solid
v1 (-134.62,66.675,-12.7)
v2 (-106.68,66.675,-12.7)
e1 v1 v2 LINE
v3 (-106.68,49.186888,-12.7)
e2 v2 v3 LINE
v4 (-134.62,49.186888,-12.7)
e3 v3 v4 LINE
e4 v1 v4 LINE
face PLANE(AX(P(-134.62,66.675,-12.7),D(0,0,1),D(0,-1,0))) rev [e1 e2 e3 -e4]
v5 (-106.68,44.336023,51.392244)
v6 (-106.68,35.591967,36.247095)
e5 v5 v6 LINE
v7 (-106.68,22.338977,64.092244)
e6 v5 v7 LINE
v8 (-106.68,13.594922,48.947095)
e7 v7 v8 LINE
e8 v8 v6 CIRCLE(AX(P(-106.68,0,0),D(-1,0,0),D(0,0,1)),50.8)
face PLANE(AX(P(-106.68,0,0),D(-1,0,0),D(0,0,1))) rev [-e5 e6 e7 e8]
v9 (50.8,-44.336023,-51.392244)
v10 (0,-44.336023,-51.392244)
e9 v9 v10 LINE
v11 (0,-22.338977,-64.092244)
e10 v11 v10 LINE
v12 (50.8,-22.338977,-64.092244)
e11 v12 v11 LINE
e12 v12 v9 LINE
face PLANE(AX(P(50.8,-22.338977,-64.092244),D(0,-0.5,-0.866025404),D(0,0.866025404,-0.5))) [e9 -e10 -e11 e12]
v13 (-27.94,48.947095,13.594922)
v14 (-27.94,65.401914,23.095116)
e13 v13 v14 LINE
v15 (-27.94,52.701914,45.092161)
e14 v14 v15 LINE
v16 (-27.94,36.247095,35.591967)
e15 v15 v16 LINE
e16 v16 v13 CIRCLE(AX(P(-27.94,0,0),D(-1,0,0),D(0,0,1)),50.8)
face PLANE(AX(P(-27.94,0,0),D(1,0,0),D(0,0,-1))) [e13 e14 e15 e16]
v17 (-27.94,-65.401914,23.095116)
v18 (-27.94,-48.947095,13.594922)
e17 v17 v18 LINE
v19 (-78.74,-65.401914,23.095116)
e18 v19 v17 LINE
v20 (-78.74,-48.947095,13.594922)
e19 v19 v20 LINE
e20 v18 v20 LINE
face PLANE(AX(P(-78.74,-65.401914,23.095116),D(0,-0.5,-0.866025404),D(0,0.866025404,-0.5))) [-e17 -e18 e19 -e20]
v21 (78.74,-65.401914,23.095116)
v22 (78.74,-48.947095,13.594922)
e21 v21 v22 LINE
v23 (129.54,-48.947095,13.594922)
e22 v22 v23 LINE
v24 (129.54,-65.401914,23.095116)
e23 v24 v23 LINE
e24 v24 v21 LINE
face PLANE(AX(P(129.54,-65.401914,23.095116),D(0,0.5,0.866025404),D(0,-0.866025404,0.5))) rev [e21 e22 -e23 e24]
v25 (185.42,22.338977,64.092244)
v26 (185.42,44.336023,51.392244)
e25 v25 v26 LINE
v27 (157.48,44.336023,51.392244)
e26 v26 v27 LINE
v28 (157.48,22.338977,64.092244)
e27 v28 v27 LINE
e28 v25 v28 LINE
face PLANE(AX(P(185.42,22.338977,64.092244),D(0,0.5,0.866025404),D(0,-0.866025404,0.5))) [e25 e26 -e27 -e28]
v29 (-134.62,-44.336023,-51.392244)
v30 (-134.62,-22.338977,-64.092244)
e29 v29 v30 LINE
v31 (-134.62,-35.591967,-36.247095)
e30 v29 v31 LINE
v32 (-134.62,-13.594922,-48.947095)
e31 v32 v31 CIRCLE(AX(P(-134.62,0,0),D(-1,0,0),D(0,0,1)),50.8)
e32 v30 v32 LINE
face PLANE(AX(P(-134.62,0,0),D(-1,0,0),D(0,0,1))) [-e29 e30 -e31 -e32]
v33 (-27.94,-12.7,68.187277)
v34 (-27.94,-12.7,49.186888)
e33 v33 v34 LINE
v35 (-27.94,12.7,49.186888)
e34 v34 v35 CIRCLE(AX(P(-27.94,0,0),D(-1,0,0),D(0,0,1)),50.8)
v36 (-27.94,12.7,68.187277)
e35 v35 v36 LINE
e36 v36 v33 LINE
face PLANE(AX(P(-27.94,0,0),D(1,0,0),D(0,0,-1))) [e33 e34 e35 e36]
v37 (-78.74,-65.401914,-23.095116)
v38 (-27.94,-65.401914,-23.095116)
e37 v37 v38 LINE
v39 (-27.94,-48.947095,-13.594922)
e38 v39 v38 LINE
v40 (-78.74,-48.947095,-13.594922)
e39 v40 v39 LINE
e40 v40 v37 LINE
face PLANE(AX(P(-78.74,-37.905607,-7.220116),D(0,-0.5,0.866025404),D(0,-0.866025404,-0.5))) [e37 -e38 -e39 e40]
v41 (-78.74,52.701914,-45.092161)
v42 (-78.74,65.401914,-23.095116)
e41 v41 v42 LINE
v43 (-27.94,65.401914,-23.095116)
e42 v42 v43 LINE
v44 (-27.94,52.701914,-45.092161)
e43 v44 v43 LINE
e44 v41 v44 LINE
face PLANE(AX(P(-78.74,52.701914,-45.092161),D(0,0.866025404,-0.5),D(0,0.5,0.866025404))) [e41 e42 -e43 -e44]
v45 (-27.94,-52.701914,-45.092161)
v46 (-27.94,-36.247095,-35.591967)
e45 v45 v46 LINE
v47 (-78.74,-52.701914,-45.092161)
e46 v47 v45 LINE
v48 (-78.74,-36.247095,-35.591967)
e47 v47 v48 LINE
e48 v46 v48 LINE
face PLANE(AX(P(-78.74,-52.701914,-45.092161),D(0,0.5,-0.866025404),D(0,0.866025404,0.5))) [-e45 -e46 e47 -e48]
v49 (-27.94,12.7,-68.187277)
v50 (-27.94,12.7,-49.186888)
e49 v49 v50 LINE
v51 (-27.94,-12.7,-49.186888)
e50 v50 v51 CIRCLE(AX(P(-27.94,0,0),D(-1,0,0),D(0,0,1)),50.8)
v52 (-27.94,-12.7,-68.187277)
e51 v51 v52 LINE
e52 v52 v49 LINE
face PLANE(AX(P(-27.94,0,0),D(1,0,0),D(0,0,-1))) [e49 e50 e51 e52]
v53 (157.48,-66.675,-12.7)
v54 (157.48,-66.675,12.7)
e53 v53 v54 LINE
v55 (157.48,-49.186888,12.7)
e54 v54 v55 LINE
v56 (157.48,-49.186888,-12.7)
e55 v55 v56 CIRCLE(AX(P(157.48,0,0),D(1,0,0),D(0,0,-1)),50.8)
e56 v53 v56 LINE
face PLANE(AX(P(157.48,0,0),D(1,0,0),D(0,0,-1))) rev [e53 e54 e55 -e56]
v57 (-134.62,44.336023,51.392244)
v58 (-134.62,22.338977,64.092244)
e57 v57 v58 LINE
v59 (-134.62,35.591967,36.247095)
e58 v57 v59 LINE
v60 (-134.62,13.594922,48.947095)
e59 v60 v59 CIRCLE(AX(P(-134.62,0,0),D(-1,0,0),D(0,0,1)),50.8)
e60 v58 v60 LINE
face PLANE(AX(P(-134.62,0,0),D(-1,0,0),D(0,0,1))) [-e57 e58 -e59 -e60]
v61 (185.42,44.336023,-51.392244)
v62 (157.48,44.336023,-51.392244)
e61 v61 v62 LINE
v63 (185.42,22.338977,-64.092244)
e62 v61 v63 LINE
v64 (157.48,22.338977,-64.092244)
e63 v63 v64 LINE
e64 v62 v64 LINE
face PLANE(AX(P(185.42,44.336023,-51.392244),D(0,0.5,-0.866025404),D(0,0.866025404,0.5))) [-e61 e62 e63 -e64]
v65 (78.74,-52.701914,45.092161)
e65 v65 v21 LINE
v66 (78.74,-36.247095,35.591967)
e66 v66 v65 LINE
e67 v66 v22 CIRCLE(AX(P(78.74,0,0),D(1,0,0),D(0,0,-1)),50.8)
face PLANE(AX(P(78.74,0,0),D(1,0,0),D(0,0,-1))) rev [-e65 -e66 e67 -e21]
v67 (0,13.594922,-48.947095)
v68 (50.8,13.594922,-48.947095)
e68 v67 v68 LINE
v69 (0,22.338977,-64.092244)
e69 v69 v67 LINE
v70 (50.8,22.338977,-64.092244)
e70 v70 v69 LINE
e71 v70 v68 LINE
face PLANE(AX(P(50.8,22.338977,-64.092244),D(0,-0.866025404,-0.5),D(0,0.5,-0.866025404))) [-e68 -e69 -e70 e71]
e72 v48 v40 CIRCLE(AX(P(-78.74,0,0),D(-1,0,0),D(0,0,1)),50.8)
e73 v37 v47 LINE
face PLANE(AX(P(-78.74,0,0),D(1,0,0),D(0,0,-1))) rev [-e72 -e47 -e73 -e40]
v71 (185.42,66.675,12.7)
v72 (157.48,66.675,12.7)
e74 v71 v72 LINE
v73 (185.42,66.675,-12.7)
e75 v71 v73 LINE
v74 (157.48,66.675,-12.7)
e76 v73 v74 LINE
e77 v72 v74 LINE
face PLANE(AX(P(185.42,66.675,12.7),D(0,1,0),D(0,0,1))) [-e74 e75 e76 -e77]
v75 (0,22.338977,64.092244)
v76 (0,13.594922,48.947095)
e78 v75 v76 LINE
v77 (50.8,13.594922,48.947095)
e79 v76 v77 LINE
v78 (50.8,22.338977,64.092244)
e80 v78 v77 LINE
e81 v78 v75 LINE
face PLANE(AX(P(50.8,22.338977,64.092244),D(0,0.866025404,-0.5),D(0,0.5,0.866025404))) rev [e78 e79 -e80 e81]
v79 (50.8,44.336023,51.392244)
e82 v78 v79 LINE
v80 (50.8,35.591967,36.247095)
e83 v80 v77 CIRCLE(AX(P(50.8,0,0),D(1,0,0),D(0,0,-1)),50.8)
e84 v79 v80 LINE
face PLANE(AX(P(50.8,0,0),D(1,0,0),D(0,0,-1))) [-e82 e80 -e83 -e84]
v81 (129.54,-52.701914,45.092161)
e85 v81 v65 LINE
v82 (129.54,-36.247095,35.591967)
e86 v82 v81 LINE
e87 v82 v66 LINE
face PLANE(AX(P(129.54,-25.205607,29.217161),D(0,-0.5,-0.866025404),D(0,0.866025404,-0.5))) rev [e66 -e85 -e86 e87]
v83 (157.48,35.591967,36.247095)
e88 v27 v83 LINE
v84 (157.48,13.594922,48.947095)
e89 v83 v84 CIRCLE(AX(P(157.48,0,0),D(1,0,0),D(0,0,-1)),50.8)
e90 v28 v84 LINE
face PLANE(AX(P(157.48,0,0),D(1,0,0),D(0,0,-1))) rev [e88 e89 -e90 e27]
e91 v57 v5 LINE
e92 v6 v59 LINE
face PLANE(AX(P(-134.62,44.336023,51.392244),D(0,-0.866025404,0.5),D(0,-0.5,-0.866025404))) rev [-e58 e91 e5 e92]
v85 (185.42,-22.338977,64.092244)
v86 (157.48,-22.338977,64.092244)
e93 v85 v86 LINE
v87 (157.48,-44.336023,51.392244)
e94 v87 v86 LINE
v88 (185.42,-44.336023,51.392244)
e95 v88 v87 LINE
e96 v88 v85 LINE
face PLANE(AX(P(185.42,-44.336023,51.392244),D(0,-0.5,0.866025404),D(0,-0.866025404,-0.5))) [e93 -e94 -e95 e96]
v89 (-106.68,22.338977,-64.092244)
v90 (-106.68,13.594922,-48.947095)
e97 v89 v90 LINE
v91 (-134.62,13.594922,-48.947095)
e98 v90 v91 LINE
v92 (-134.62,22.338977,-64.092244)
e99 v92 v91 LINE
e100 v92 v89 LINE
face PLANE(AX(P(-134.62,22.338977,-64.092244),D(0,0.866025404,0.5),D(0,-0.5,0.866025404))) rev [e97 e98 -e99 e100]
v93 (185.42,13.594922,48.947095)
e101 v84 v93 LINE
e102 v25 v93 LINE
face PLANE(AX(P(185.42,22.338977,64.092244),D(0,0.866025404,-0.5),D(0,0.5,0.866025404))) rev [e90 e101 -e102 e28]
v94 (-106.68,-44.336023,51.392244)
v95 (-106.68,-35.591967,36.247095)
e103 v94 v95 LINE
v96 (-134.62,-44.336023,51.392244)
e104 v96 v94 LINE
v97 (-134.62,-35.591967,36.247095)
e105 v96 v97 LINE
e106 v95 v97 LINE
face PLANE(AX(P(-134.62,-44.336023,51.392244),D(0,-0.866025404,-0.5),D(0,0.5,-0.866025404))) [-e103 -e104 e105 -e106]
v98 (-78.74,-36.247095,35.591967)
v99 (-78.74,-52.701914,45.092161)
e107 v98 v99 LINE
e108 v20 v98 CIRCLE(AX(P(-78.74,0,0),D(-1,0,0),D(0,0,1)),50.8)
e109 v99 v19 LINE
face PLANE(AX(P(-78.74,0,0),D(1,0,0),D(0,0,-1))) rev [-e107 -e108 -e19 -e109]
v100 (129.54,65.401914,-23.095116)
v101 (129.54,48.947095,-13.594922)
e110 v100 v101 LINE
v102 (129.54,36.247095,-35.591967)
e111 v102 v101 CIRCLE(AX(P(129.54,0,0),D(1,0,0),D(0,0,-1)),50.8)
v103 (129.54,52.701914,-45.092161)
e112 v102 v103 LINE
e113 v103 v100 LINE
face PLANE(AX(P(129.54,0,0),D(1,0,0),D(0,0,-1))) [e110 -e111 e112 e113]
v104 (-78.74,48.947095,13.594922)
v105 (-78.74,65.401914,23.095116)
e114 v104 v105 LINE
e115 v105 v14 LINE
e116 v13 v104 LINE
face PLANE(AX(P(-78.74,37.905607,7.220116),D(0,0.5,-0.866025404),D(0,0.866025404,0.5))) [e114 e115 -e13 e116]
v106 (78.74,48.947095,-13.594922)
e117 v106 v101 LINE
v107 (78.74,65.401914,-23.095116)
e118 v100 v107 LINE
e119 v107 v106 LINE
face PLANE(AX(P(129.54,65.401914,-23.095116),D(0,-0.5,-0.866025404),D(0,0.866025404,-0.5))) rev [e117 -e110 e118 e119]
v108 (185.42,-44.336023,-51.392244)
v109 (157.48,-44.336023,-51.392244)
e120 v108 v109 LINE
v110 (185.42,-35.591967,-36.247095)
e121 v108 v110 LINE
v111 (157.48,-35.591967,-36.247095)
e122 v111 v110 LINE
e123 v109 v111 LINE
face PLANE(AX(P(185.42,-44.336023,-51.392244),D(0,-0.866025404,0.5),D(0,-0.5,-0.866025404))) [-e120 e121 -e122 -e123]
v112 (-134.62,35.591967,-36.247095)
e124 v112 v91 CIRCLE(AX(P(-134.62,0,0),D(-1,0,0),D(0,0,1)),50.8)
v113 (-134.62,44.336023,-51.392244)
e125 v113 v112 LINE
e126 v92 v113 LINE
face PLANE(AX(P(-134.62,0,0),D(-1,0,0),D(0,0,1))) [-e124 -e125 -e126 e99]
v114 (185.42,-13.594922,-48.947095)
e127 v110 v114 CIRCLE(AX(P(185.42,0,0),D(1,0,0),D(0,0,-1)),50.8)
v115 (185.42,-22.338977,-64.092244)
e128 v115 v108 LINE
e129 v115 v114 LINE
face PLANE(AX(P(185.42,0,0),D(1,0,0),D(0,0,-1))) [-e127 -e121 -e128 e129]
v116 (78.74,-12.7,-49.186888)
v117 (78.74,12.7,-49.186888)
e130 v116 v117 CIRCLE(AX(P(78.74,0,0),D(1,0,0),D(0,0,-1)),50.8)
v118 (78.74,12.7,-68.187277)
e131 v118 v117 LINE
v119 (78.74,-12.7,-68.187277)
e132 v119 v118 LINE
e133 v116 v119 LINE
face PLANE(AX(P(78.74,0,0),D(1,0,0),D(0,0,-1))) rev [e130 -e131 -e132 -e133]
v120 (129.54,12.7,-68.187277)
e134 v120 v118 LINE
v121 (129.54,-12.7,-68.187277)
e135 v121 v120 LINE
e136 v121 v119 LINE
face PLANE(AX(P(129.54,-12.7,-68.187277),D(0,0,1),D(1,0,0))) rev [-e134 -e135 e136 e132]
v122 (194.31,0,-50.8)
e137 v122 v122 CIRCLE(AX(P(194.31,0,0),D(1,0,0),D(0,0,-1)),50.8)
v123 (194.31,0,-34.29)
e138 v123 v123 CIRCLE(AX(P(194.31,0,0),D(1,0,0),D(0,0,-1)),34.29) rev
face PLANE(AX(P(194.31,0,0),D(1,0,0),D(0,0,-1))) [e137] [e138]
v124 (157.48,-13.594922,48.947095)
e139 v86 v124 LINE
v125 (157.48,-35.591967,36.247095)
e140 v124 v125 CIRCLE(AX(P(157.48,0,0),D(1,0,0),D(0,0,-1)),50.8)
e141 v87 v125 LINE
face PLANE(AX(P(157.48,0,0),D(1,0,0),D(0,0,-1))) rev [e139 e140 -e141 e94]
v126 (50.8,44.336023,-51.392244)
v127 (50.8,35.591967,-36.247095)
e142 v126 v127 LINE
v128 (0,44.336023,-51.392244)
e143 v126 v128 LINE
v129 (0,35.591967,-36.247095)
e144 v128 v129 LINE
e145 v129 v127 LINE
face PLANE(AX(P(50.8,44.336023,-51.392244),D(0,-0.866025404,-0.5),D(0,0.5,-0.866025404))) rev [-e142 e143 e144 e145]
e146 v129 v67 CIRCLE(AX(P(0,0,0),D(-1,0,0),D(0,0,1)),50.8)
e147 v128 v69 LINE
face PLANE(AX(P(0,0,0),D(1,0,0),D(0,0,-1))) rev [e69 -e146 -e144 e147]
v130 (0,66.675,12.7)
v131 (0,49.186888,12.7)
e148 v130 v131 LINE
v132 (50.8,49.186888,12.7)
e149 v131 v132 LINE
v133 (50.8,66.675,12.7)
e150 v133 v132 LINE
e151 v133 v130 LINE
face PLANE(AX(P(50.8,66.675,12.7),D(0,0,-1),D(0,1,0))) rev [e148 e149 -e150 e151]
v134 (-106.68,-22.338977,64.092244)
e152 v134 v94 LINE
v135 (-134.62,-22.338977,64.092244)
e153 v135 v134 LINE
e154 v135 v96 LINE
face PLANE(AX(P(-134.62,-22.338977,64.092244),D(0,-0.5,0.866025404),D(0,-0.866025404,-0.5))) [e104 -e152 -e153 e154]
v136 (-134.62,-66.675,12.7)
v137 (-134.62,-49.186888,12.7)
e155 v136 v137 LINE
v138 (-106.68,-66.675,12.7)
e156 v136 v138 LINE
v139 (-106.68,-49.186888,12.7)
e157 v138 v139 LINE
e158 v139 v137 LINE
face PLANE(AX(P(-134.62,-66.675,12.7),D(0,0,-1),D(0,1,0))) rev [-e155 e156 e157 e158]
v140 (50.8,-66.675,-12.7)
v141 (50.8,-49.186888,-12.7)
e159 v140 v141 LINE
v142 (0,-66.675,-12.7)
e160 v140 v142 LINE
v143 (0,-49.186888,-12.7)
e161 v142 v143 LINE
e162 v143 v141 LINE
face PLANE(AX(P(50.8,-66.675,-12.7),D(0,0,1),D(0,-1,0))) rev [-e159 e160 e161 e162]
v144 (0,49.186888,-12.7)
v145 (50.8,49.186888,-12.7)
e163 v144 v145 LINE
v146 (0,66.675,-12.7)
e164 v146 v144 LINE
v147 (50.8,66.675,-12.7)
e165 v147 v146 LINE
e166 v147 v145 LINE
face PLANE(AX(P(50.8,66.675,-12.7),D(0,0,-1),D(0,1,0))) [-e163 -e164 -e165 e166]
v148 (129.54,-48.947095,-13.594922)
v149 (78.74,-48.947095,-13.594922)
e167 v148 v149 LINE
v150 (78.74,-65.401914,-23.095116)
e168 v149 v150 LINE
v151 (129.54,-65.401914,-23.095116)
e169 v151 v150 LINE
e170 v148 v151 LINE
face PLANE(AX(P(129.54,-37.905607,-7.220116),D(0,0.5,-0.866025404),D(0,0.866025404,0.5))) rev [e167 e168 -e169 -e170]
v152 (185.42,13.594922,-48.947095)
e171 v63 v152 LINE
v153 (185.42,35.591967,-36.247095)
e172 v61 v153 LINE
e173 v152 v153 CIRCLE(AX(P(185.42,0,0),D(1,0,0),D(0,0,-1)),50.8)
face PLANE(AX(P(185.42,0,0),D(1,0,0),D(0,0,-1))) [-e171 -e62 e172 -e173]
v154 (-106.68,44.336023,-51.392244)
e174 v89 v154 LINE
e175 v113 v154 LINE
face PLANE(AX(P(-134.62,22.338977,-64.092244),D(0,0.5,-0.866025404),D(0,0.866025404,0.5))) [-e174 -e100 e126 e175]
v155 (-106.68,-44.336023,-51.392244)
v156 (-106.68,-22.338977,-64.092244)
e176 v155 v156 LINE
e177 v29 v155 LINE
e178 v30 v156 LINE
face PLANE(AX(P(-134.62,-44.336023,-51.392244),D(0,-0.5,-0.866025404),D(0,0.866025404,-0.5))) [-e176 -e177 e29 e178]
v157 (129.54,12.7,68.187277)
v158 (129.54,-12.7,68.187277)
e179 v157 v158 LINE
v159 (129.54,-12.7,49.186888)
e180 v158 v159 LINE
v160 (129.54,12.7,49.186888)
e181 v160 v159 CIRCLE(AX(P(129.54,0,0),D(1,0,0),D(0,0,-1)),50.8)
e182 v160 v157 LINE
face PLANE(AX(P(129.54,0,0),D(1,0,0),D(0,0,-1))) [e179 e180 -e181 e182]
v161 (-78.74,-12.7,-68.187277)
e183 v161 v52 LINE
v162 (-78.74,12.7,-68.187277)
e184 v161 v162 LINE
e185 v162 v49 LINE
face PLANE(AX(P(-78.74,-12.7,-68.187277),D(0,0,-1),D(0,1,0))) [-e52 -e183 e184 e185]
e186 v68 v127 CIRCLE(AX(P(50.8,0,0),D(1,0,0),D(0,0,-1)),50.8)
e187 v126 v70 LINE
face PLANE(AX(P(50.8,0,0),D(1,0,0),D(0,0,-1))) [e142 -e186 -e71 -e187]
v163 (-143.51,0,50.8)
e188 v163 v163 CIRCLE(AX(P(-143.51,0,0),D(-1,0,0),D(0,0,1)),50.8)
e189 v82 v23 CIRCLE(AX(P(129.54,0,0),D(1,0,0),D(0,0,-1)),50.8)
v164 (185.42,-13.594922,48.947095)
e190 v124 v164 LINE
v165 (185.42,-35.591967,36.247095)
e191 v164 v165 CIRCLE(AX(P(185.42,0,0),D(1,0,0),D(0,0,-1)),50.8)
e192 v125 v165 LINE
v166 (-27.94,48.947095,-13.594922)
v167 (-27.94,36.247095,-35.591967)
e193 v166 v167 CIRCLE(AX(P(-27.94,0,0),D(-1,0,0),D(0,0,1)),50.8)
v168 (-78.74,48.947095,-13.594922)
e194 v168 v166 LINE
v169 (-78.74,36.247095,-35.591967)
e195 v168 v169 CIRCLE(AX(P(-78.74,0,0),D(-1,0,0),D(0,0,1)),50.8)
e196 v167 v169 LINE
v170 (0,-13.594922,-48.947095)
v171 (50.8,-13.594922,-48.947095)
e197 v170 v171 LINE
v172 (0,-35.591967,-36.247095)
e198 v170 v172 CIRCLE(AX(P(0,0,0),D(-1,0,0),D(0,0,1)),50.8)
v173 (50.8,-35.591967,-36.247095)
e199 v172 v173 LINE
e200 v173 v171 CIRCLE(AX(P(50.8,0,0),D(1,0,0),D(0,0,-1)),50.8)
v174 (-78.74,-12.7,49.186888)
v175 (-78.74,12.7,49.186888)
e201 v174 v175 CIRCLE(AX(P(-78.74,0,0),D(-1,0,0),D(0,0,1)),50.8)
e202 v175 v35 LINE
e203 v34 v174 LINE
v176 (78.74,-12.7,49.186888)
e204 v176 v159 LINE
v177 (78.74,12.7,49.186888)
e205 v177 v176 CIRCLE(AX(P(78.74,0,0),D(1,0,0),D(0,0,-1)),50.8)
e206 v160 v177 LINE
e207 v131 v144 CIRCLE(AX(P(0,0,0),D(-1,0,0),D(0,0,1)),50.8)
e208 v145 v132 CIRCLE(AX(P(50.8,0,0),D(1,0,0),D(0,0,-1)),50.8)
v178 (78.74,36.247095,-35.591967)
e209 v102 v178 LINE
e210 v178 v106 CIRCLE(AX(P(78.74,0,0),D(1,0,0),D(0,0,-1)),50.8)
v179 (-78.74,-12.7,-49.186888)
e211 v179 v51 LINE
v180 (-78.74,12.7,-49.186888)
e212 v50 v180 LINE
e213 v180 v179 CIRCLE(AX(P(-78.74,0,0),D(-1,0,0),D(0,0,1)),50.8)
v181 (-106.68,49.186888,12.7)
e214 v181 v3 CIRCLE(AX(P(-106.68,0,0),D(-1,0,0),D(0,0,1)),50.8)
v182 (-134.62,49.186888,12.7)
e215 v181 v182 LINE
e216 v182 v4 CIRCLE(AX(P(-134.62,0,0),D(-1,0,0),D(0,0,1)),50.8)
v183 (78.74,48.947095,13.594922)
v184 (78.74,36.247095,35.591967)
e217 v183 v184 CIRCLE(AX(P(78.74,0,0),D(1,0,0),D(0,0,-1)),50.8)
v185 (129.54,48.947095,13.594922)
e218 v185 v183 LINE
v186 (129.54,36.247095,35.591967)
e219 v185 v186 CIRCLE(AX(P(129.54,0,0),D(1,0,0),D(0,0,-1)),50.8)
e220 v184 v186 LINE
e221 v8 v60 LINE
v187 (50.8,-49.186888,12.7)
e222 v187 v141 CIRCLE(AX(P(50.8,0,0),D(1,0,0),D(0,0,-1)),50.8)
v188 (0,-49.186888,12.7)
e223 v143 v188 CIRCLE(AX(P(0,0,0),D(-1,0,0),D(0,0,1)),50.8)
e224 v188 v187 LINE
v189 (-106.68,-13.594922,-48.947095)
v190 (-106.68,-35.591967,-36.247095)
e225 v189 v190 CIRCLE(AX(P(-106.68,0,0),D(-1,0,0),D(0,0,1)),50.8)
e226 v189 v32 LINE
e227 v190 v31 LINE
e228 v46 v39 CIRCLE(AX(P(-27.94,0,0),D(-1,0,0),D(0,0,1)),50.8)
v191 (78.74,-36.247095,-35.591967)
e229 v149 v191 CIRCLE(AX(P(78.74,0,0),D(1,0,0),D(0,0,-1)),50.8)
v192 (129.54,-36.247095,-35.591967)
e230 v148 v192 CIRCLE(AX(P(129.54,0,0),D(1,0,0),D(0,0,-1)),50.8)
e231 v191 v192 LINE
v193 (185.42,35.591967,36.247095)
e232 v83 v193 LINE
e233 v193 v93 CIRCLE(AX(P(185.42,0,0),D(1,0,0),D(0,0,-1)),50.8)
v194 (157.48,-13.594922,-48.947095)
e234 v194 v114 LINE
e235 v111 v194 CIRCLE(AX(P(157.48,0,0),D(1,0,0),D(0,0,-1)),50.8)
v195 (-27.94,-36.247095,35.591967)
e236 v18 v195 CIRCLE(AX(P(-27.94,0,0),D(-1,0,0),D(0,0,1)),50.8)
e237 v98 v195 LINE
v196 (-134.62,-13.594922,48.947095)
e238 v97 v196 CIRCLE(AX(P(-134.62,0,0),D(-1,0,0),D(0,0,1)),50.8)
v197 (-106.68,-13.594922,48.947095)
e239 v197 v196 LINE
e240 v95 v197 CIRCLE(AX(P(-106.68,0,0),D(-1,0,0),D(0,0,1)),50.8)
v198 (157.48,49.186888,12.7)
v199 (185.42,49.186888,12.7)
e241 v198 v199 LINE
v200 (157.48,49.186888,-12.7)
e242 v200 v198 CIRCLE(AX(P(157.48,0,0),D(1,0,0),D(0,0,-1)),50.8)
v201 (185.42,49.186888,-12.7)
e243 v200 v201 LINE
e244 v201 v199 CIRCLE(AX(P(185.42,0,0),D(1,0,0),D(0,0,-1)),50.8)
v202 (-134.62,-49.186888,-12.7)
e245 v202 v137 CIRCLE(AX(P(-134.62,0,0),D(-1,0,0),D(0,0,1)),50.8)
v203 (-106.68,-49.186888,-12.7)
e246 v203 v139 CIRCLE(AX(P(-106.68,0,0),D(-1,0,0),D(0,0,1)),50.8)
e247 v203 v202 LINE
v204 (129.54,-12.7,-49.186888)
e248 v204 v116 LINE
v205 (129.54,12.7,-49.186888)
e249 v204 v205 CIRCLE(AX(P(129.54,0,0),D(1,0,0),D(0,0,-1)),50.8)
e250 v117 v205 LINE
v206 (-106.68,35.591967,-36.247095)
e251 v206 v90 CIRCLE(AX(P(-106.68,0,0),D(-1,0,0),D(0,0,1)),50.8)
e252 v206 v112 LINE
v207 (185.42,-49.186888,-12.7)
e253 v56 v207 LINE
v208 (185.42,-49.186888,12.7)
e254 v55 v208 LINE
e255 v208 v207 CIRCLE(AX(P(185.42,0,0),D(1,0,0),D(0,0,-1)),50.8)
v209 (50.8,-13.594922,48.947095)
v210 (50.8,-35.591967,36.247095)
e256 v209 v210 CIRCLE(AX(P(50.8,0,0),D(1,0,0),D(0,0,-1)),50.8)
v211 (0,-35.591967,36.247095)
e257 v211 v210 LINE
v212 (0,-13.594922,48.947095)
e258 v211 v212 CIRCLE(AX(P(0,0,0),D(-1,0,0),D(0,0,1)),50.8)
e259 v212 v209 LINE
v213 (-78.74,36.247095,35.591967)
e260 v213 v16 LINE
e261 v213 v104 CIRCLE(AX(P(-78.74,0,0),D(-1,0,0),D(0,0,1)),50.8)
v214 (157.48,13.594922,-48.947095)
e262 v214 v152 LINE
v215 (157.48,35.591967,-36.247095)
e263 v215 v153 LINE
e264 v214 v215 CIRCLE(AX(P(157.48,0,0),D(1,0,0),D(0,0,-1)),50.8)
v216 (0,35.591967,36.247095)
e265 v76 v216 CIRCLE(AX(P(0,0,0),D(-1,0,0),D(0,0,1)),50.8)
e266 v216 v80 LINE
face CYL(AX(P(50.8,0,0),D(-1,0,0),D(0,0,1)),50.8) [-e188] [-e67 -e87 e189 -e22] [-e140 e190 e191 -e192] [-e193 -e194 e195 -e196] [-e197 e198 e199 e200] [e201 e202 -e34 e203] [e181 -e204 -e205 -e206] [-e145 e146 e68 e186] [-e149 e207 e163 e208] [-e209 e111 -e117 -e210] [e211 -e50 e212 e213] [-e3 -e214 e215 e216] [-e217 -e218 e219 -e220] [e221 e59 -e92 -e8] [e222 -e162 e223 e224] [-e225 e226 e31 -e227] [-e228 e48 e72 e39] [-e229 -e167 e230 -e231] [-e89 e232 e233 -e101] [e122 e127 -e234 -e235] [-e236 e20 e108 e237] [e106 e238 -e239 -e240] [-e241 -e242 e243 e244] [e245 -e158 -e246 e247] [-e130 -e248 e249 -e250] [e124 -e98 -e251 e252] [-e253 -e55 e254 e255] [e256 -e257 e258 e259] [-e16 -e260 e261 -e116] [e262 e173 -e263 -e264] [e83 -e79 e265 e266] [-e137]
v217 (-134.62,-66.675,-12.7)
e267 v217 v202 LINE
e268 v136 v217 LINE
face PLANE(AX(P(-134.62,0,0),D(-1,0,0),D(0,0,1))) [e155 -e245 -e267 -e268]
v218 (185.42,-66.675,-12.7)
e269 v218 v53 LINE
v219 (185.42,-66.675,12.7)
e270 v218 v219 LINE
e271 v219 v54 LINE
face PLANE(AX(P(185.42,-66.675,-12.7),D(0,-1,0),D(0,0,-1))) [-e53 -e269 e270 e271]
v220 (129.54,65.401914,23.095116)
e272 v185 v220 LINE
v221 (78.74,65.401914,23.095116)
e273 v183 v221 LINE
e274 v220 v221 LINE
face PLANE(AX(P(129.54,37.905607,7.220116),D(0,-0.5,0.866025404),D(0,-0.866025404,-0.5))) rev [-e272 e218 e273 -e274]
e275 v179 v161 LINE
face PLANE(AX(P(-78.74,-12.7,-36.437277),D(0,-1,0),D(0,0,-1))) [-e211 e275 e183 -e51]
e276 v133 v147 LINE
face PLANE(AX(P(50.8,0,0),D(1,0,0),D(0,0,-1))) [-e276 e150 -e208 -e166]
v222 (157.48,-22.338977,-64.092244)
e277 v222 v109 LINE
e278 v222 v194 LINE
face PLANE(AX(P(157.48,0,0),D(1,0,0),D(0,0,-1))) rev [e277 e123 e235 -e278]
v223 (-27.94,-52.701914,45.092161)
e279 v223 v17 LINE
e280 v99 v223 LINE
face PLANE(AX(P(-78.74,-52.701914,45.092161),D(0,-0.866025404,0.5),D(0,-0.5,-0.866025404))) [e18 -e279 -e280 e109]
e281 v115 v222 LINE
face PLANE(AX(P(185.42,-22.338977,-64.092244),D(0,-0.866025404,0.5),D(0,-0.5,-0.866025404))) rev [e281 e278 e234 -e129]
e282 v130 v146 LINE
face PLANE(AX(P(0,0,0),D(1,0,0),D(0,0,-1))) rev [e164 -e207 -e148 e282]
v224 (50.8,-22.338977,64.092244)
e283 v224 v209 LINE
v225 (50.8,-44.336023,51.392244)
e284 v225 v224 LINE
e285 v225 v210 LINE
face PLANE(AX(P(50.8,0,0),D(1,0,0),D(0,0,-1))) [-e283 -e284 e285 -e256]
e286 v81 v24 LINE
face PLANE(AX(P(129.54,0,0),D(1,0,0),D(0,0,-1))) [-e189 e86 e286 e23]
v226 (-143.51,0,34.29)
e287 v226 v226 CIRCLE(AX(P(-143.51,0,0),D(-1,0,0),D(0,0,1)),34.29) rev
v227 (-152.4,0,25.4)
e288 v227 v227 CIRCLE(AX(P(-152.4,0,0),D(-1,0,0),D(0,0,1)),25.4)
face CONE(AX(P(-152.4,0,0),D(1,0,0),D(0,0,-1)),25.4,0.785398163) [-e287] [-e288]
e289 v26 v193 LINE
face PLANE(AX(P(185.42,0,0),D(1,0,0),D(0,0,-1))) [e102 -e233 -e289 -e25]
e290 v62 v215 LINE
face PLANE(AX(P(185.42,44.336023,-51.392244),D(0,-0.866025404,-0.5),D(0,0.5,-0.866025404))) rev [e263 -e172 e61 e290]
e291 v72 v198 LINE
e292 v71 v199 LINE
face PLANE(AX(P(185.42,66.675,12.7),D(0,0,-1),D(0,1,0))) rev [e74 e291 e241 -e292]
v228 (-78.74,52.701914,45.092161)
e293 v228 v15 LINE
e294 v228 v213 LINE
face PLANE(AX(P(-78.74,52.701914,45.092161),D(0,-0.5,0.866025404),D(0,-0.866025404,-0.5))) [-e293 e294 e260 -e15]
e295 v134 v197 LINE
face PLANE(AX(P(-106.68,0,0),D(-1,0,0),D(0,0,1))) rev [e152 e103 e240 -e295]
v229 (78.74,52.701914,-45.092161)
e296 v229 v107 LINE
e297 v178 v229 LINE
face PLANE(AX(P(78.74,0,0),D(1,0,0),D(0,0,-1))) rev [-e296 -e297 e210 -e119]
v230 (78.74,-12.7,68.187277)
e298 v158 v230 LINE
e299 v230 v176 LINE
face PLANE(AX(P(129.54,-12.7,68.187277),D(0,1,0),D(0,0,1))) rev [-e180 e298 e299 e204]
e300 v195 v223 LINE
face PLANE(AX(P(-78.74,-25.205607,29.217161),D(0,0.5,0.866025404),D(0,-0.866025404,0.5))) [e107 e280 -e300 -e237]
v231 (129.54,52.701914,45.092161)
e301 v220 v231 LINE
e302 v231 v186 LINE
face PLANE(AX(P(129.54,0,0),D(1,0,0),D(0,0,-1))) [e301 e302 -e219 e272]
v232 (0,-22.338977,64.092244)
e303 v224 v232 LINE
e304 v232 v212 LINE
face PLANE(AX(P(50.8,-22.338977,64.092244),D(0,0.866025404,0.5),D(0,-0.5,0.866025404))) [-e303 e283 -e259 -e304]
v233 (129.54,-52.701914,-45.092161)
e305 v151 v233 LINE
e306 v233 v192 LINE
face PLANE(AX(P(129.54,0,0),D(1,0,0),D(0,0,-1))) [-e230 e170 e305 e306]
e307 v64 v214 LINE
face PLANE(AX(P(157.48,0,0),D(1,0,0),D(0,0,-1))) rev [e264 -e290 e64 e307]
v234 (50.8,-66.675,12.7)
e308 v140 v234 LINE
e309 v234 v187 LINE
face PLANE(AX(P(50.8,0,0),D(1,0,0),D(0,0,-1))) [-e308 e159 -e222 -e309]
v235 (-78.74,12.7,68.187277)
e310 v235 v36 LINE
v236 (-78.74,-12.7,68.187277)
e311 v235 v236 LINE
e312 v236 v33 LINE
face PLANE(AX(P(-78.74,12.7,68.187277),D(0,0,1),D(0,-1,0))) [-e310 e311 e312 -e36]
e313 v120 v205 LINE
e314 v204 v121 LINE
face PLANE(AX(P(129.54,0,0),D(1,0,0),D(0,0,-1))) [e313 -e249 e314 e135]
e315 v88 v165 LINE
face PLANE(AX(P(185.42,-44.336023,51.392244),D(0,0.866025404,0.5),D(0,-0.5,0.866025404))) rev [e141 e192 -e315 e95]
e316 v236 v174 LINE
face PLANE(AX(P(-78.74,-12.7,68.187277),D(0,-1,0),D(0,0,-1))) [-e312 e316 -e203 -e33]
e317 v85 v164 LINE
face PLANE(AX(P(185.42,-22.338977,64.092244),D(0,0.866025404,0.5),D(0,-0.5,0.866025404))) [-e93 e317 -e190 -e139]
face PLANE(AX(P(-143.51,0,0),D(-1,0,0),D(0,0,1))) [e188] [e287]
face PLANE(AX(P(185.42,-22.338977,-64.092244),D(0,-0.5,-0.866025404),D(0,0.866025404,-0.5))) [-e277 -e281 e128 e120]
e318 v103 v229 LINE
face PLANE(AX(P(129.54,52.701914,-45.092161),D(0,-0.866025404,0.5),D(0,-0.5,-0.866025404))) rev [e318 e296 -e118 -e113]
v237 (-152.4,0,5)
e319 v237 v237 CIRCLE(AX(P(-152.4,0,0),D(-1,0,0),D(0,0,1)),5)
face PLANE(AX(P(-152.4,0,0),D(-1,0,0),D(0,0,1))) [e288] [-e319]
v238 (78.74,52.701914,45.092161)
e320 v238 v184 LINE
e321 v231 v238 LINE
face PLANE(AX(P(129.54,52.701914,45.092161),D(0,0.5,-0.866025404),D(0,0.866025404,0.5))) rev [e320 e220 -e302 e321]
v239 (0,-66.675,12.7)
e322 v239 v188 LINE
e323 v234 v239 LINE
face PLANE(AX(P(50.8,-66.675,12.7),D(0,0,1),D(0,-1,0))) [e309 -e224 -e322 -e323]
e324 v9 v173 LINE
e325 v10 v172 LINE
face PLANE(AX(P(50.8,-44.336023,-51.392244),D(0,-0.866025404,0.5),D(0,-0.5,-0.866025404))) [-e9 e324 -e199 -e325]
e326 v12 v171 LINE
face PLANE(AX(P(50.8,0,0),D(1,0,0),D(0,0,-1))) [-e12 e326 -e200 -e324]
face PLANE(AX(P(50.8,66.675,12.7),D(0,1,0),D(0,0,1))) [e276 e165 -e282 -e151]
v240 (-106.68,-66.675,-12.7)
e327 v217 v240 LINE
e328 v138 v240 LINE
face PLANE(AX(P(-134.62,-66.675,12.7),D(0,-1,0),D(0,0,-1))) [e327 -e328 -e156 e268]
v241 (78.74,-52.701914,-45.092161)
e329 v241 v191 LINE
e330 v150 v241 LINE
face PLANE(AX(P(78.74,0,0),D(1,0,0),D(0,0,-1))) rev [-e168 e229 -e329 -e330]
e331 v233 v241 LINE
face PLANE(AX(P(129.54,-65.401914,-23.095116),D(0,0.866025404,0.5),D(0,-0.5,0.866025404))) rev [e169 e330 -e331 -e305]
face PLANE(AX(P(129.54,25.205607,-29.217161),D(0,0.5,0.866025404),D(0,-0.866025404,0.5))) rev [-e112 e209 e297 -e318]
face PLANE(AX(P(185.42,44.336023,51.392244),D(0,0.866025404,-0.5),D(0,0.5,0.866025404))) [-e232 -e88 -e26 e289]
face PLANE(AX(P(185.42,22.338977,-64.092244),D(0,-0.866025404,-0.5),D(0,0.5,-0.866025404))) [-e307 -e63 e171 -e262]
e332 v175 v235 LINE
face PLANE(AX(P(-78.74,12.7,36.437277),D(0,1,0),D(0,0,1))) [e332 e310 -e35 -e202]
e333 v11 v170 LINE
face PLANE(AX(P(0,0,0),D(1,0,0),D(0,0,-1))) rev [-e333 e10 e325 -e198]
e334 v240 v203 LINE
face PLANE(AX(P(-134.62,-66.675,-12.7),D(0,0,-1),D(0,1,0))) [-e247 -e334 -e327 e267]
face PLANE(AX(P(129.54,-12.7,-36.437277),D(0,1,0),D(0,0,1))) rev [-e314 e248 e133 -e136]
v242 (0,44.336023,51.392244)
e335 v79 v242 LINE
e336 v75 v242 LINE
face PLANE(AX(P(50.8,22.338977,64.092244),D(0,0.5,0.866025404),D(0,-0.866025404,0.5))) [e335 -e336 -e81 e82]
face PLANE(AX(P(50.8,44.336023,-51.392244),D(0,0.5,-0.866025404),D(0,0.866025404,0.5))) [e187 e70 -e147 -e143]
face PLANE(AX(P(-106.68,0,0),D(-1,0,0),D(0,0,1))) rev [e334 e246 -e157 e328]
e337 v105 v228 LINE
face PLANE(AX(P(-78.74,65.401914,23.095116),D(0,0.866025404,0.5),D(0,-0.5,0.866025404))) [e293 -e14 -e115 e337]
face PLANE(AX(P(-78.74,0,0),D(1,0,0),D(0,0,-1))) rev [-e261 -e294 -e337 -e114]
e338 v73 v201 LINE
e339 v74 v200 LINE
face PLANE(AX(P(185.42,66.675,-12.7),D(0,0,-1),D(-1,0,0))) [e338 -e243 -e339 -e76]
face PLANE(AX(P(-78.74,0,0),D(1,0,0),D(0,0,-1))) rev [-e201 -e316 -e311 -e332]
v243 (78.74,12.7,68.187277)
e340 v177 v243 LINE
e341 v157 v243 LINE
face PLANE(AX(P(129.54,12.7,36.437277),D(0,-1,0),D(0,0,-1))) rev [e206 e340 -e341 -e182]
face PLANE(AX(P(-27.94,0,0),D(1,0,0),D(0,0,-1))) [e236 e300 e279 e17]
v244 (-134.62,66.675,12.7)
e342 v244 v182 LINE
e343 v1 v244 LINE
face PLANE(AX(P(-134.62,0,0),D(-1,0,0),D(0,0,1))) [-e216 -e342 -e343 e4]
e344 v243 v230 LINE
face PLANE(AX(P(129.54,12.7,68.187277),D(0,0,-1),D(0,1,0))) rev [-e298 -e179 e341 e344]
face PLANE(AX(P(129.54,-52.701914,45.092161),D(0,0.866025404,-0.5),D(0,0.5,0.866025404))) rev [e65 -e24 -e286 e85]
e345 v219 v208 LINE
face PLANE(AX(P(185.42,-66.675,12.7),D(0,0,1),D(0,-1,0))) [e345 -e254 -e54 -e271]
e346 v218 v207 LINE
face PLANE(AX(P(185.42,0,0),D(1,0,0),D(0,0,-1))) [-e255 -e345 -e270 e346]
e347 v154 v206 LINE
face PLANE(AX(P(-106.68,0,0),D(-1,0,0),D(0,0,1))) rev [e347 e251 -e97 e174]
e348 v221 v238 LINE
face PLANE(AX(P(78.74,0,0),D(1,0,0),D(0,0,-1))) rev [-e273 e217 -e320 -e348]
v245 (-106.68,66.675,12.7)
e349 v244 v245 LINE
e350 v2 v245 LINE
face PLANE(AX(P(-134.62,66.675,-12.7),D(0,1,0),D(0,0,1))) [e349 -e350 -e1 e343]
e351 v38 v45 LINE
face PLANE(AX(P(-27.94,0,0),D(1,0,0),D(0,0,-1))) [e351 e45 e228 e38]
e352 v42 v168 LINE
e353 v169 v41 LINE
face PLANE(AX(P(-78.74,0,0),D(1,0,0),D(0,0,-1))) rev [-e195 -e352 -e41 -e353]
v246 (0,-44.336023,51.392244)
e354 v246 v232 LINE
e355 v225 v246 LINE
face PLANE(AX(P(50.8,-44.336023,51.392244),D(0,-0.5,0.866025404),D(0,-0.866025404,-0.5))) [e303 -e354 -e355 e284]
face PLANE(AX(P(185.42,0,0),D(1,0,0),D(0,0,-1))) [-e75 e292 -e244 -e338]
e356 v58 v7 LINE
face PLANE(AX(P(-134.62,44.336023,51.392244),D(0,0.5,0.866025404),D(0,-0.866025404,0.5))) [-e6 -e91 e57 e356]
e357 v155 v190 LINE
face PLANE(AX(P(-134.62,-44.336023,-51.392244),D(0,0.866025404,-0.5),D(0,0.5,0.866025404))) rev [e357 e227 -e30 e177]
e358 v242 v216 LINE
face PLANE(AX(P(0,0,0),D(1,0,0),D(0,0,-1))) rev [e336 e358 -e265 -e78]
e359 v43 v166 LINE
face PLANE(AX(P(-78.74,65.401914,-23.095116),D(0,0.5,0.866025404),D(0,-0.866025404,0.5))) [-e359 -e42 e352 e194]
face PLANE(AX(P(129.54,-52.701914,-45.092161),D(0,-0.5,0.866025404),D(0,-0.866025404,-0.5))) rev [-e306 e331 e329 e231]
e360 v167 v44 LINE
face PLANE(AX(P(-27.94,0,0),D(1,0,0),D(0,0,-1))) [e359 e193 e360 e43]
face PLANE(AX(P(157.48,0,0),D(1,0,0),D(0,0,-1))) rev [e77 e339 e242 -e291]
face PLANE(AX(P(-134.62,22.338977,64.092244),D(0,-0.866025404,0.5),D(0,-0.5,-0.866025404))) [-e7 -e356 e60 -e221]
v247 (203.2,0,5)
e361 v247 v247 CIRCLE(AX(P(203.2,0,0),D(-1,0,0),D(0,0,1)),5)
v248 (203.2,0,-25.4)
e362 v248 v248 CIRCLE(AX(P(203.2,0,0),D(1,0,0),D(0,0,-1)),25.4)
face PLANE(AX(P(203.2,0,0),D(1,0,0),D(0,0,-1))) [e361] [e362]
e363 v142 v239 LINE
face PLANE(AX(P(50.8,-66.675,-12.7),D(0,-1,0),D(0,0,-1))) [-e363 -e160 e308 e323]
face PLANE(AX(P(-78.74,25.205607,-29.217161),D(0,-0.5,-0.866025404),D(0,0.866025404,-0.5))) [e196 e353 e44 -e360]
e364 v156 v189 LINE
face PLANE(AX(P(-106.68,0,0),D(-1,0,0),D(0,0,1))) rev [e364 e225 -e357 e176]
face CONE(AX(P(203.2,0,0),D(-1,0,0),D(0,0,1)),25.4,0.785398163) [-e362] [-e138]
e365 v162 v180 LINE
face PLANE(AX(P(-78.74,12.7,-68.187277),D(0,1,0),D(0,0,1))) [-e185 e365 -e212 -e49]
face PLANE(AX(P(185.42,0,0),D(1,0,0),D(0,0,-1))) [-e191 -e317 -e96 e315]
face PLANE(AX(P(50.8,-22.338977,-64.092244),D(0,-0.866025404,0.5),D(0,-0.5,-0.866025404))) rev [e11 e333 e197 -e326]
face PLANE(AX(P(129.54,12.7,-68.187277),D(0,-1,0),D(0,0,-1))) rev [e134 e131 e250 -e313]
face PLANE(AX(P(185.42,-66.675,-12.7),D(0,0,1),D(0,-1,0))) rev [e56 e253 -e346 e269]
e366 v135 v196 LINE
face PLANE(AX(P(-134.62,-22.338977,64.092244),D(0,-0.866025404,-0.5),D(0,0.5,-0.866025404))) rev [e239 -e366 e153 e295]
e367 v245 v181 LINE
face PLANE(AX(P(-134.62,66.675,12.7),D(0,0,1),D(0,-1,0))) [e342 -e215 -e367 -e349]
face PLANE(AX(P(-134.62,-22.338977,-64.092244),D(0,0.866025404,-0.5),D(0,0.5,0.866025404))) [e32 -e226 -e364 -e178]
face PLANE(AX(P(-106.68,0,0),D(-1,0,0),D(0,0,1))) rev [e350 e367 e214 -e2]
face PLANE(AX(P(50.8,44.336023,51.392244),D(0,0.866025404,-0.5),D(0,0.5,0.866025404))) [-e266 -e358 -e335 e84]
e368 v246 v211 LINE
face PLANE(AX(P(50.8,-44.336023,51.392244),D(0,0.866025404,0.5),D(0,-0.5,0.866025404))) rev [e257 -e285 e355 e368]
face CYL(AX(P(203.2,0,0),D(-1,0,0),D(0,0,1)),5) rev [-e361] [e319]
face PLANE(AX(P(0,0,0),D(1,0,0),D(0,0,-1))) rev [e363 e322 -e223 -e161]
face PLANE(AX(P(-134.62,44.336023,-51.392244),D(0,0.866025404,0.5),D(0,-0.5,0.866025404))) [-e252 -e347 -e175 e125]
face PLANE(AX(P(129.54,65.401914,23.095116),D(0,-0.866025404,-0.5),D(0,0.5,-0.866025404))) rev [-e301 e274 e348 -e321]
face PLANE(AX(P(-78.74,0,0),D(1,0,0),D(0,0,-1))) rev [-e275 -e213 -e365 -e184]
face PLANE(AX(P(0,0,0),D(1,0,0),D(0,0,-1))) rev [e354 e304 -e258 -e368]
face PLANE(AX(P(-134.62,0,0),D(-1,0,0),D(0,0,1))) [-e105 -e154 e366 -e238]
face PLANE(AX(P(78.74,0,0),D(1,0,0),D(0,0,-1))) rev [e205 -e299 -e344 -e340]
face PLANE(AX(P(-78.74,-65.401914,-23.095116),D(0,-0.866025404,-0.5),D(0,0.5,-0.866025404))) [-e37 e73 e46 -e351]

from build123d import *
from build123d.topology import SkipClean

# Parameters (mm, degrees)
SKETCH1_R            = 50.8
SKETCH1_W            = 25.4
SKETCH1_H            = 31.75
BOSS_EXTRUDE3_DEPTH  = 50.8
SKETCH2_R            = 50.8
BOSS_EXTRUDE4_DEPTH  = 27.94
SKETCH3_R            = 50.8
BOSS_EXTRUDE5_DEPTH  = 50.8
SKETCH4_R            = 50.8
BOSS_EXTRUDE6_DEPTH  = 27.94
SKETCH5_R            = 50.8
SKETCH5_W            = 25.4
SKETCH5_H            = 31.75
BOSS_EXTRUDE7_DEPTH  = 27.94
BOSS_EXTRUDE8_START  = 27.94
SKETCH6_R            = 50.8
BOSS_EXTRUDE8_DEPTH  = 27.94
BOSS_EXTRUDE9_START  = 50.8
SKETCH7_R            = 50.8
SKETCH7_W            = 31.75
SKETCH7_H            = 25.4
BOSS_EXTRUDE9_DEPTH  = 50.8
BOSS_EXTRUDE10_START = 27.94
SKETCH8_R            = 50.8
BOSS_EXTRUDE10_DEPTH = 27.94
BOSS_EXTRUDE11_START = 27.94
SKETCH9_R            = 50.8
SKETCH9_W            = 25.4
SKETCH9_H            = 31.75
BOSS_EXTRUDE11_DEPTH = 27.94
SKETCH10_R           = 50.8
BOSS_EXTRUDE12_DEPTH = 8.89
BOSS_EXTRUDE13_START = 8.89
SKETCH11_R           = 50.8
BOSS_EXTRUDE13_DEPTH = 8.89
SKETCH12_R           = 25.4
BOSS_EXTRUDE14_DEPTH = 8.89
BOSS_EXTRUDE15_START = 8.89
SKETCH13_R           = 25.4
BOSS_EXTRUDE15_DEPTH = 8.89
SKETCH14_R           = 5
CUT_EXTRUDE1_DEPTH   = 369.166294367
CHAMFER3_SIZE        = 8.89


with BuildPart() as part:
    # Sketch1 → Boss-Extrude3 (new body)
    with BuildSketch(Plane(origin=(0, 0, 0), x_dir=(0, 0, -1), z_dir=(1, 0, 0))):
        Circle(SKETCH1_R)
        with Locations((0, 50.8)):
            Rectangle(SKETCH1_W, SKETCH1_H)
        Polygon((51.392243797, 44.336022628), (23.895937227, 28.461022628), (36.595937227, 6.463977372), (64.092243797, 22.338977372), align=None)
        Polygon((64.092243797, -22.338977372), (36.595937227, -6.463977372), (23.895937227, -28.461022628), (51.392243797, -44.336022628), align=None)
        with Locations((0, -50.8)):
            Rectangle(SKETCH1_W, SKETCH1_H)
        Polygon((-51.392243797, -44.336022628), (-23.895937227, -28.461022628), (-36.595937227, -6.463977372), (-64.092243797, -22.338977372), align=None)
        Polygon((-64.092243797, 22.338977372), (-36.595937227, 6.463977372), (-23.895937227, 28.461022628), (-51.392243797, 44.336022628), align=None)
    extrude(amount=BOSS_EXTRUDE3_DEPTH)

    # Sketch2 → Boss-Extrude4 (add)
    with BuildSketch(Plane(origin=(50.8, 0, 0), x_dir=(0, 0, -1), z_dir=(1, 0, 0))):
        with Locations(Location((0, 0, 0), (0, 0, 164.477512186))):
            Circle(SKETCH2_R)
    extrude(amount=BOSS_EXTRUDE4_DEPTH)

    # Sketch3 → Boss-Extrude5 (add)
    with BuildSketch(Plane(origin=(78.74, 0, 0), x_dir=(0, 0, -1), z_dir=(1, 0, 0))):
        with Locations(Location((0, 0, 0), (0, 0, 165.522487814))):
            Circle(SKETCH3_R)
        Polygon((36.437276545, 12.7), (36.437276545, 0), (36.437276545, -12.7), (68.187276545, -12.7), (68.187276545, 12.7), align=None)
        Polygon((18.218638272, 31.555607132), (29.2171609, 25.205607132), (45.0921609, 52.701913703), (23.095115644, 65.401913703), (7.220115644, 37.905607132), align=None)
        Polygon((29.2171609, -25.205607132), (18.218638272, -31.555607132), (7.220115644, -37.905607132), (23.095115644, -65.401913703), (45.0921609, -52.701913703), align=None)
        Polygon((-7.220115644, -37.905607132), (-18.218638272, -31.555607132), (-29.2171609, -25.205607132), (-45.0921609, -52.701913703), (-23.095115644, -65.401913703), align=None)
        Polygon((-36.437276545, -12.7), (-36.437276545, 0), (-36.437276545, 12.7), (-68.187276545, 12.7), (-68.187276545, -12.7), align=None)
        Polygon((-29.2171609, 25.205607132), (-18.218638272, 31.555607132), (-7.220115644, 37.905607132), (-23.095115644, 65.401913703), (-45.0921609, 52.701913703), align=None)
    extrude(amount=BOSS_EXTRUDE5_DEPTH)

    # Sketch4 → Boss-Extrude6 (add)
    with BuildSketch(Plane(origin=(129.54, 0, 0), x_dir=(0, 0, -1), z_dir=(1, 0, 0))):
        with Locations(Location((0, 0, 0), (0, 0, 164.477512186))):
            Circle(SKETCH4_R)
    extrude(amount=BOSS_EXTRUDE6_DEPTH)

    # Sketch5 → Boss-Extrude7 (add)
    with BuildSketch(Plane(origin=(157.48, 0, 0), x_dir=(0, 0, -1), z_dir=(1, 0, 0))):
        with Locations(Location((0, 0, 0), (0, 0, 164.477512186))):
            Circle(SKETCH5_R)
        with Locations((0, 50.8)):
            Rectangle(SKETCH5_W, SKETCH5_H)
        Polygon((51.392243797, 44.336022628), (23.895937227, 28.461022628), (36.595937227, 6.463977372), (64.092243797, 22.338977372), align=None)
        Polygon((64.092243797, -22.338977372), (36.595937227, -6.463977372), (23.895937227, -28.461022628), (51.392243797, -44.336022628), align=None)
        with Locations((0, -50.8)):
            Rectangle(SKETCH5_W, SKETCH5_H)
        Polygon((-51.392243797, -44.336022628), (-23.895937227, -28.461022628), (-36.595937227, -6.463977372), (-64.092243797, -22.338977372), align=None)
        Polygon((-64.092243797, 22.338977372), (-36.595937227, 6.463977372), (-23.895937227, 28.461022628), (-51.392243797, 44.336022628), align=None)
    extrude(amount=BOSS_EXTRUDE7_DEPTH)

    # Sketch6 → Boss-Extrude8 (add)
    with SkipClean():  # the faces are left unmerged after this step: merging them gives an invalid solid
        with BuildSketch(Plane.ZY.offset(BOSS_EXTRUDE8_START)):
            Circle(SKETCH6_R)
        extrude(amount=-BOSS_EXTRUDE8_DEPTH)

    # Sketch7 → Boss-Extrude9 (add)
    with SkipClean():  # the faces are left unmerged after this step: merging them gives an invalid solid
        with BuildSketch(Plane.ZY.offset(27.94).offset(BOSS_EXTRUDE9_START)):
            with Locations(Location((0, 0, 0), (0, 0, 345.522487814))):
                Circle(SKETCH7_R)
            Polygon((23.095115644, 65.401913703), (45.0921609, 52.701913703), (29.2171609, 25.205607132), (7.220115644, 37.905607132), align=None)
            with Locations((52.312276545, 0)):
                Rectangle(SKETCH7_W, SKETCH7_H)
            Polygon((29.2171609, -25.205607132), (45.0921609, -52.701913703), (23.095115644, -65.401913703), (7.220115644, -37.905607132), align=None)
            Polygon((-7.220115644, -37.905607132), (-23.095115644, -65.401913703), (-45.0921609, -52.701913703), (-29.2171609, -25.205607132), align=None)
            with Locations((-52.312276545, 0)):
                Rectangle(SKETCH7_W, SKETCH7_H)
            Polygon((-29.2171609, 25.205607132), (-45.0921609, 52.701913703), (-23.095115644, 65.401913703), (-7.220115644, 37.905607132), align=None)
        extrude(amount=-BOSS_EXTRUDE9_DEPTH)

    # Sketch8 → Boss-Extrude10 (add)
    with SkipClean():  # the faces are left unmerged after this step: merging them gives an invalid solid
        with BuildSketch(Plane.ZY.offset(78.74).offset(BOSS_EXTRUDE10_START)):
            Circle(SKETCH8_R)
        extrude(amount=-BOSS_EXTRUDE10_DEPTH)

    # Sketch9 → Boss-Extrude11 (add)
    with SkipClean():  # the faces are left unmerged after this step: merging them gives an invalid solid
        with BuildSketch(Plane.ZY.offset(106.68).offset(BOSS_EXTRUDE11_START)):
            with Locations(Location((0, 0, 0), (0, 0, 15.522487814))):
                Circle(SKETCH9_R)
            with Locations((0, 50.8)):
                Rectangle(SKETCH9_W, SKETCH9_H)
            Polygon((51.392243797, 44.336022628), (23.895937227, 28.461022628), (36.595937227, 6.463977372), (64.092243797, 22.338977372), align=None)
            Polygon((64.092243797, -22.338977372), (36.595937227, -6.463977372), (23.895937227, -28.461022628), (51.392243797, -44.336022628), align=None)
            with Locations((0, -50.8)):
                Rectangle(SKETCH9_W, SKETCH9_H)
            Polygon((-51.392243797, -44.336022628), (-23.895937227, -28.461022628), (-36.595937227, -6.463977372), (-64.092243797, -22.338977372), align=None)
            Polygon((-64.092243797, 22.338977372), (-36.595937227, 6.463977372), (-23.895937227, 28.461022628), (-51.392243797, 44.336022628), align=None)
        extrude(amount=-BOSS_EXTRUDE11_DEPTH)

    # Sketch10 → Boss-Extrude12 (add)
    with SkipClean():  # the faces are left unmerged after this step: merging them gives an invalid solid
        with BuildSketch(Plane(origin=(185.42, 0, 0), x_dir=(0, 0, -1), z_dir=(1, 0, 0))):
            with Locations(Location((0, 0, 0), (0, 0, 195.522487814))):
                Circle(SKETCH10_R)
        extrude(amount=BOSS_EXTRUDE12_DEPTH)

    # Sketch11 → Boss-Extrude13 (add)
    with SkipClean():  # the faces are left unmerged after this step: merging them gives an invalid solid
        with BuildSketch(Plane.ZY.offset(134.62).offset(BOSS_EXTRUDE13_START)):
            Circle(SKETCH11_R)
        extrude(amount=-BOSS_EXTRUDE13_DEPTH)

    # Sketch12 → Boss-Extrude14 (add)
    with SkipClean():  # the faces are left unmerged after this step: merging them gives an invalid solid
        with BuildSketch(Plane(origin=(194.31, 0, 0), x_dir=(0, 0, -1), z_dir=(1, 0, 0))):
            Circle(SKETCH12_R)
        extrude(amount=BOSS_EXTRUDE14_DEPTH)

    # Sketch13 → Boss-Extrude15 (add)
    with SkipClean():  # the faces are left unmerged after this step: merging them gives an invalid solid
        with BuildSketch(Plane.ZY.offset(143.51).offset(BOSS_EXTRUDE15_START)):
            with Locations(Location((0, 0, 0), (0, 0, 180))):
                Circle(SKETCH13_R)
        extrude(amount=-BOSS_EXTRUDE15_DEPTH)

    # Sketch14 → Cut-Extrude1 (cut, through all)
    with SkipClean():  # the faces are left unmerged after this step: merging them gives an invalid solid
        with BuildSketch(Plane.ZY.offset(152.4)):
            Circle(SKETCH14_R)
        extrude(amount=-CUT_EXTRUDE1_DEPTH, mode=Mode.SUBTRACT)

    # Chamfer3
    chamfer3_edges = [part.edges().sort_by_distance(p)[0] for p in [
        (194.31, 0, 25.4),
        (-143.51, 0, 25.4),
    ]]
    chamfer(chamfer3_edges, length=CHAMFER3_SIZE - 0.0001)  # a hair under: the kernel refuses the full size


solid = part.part
